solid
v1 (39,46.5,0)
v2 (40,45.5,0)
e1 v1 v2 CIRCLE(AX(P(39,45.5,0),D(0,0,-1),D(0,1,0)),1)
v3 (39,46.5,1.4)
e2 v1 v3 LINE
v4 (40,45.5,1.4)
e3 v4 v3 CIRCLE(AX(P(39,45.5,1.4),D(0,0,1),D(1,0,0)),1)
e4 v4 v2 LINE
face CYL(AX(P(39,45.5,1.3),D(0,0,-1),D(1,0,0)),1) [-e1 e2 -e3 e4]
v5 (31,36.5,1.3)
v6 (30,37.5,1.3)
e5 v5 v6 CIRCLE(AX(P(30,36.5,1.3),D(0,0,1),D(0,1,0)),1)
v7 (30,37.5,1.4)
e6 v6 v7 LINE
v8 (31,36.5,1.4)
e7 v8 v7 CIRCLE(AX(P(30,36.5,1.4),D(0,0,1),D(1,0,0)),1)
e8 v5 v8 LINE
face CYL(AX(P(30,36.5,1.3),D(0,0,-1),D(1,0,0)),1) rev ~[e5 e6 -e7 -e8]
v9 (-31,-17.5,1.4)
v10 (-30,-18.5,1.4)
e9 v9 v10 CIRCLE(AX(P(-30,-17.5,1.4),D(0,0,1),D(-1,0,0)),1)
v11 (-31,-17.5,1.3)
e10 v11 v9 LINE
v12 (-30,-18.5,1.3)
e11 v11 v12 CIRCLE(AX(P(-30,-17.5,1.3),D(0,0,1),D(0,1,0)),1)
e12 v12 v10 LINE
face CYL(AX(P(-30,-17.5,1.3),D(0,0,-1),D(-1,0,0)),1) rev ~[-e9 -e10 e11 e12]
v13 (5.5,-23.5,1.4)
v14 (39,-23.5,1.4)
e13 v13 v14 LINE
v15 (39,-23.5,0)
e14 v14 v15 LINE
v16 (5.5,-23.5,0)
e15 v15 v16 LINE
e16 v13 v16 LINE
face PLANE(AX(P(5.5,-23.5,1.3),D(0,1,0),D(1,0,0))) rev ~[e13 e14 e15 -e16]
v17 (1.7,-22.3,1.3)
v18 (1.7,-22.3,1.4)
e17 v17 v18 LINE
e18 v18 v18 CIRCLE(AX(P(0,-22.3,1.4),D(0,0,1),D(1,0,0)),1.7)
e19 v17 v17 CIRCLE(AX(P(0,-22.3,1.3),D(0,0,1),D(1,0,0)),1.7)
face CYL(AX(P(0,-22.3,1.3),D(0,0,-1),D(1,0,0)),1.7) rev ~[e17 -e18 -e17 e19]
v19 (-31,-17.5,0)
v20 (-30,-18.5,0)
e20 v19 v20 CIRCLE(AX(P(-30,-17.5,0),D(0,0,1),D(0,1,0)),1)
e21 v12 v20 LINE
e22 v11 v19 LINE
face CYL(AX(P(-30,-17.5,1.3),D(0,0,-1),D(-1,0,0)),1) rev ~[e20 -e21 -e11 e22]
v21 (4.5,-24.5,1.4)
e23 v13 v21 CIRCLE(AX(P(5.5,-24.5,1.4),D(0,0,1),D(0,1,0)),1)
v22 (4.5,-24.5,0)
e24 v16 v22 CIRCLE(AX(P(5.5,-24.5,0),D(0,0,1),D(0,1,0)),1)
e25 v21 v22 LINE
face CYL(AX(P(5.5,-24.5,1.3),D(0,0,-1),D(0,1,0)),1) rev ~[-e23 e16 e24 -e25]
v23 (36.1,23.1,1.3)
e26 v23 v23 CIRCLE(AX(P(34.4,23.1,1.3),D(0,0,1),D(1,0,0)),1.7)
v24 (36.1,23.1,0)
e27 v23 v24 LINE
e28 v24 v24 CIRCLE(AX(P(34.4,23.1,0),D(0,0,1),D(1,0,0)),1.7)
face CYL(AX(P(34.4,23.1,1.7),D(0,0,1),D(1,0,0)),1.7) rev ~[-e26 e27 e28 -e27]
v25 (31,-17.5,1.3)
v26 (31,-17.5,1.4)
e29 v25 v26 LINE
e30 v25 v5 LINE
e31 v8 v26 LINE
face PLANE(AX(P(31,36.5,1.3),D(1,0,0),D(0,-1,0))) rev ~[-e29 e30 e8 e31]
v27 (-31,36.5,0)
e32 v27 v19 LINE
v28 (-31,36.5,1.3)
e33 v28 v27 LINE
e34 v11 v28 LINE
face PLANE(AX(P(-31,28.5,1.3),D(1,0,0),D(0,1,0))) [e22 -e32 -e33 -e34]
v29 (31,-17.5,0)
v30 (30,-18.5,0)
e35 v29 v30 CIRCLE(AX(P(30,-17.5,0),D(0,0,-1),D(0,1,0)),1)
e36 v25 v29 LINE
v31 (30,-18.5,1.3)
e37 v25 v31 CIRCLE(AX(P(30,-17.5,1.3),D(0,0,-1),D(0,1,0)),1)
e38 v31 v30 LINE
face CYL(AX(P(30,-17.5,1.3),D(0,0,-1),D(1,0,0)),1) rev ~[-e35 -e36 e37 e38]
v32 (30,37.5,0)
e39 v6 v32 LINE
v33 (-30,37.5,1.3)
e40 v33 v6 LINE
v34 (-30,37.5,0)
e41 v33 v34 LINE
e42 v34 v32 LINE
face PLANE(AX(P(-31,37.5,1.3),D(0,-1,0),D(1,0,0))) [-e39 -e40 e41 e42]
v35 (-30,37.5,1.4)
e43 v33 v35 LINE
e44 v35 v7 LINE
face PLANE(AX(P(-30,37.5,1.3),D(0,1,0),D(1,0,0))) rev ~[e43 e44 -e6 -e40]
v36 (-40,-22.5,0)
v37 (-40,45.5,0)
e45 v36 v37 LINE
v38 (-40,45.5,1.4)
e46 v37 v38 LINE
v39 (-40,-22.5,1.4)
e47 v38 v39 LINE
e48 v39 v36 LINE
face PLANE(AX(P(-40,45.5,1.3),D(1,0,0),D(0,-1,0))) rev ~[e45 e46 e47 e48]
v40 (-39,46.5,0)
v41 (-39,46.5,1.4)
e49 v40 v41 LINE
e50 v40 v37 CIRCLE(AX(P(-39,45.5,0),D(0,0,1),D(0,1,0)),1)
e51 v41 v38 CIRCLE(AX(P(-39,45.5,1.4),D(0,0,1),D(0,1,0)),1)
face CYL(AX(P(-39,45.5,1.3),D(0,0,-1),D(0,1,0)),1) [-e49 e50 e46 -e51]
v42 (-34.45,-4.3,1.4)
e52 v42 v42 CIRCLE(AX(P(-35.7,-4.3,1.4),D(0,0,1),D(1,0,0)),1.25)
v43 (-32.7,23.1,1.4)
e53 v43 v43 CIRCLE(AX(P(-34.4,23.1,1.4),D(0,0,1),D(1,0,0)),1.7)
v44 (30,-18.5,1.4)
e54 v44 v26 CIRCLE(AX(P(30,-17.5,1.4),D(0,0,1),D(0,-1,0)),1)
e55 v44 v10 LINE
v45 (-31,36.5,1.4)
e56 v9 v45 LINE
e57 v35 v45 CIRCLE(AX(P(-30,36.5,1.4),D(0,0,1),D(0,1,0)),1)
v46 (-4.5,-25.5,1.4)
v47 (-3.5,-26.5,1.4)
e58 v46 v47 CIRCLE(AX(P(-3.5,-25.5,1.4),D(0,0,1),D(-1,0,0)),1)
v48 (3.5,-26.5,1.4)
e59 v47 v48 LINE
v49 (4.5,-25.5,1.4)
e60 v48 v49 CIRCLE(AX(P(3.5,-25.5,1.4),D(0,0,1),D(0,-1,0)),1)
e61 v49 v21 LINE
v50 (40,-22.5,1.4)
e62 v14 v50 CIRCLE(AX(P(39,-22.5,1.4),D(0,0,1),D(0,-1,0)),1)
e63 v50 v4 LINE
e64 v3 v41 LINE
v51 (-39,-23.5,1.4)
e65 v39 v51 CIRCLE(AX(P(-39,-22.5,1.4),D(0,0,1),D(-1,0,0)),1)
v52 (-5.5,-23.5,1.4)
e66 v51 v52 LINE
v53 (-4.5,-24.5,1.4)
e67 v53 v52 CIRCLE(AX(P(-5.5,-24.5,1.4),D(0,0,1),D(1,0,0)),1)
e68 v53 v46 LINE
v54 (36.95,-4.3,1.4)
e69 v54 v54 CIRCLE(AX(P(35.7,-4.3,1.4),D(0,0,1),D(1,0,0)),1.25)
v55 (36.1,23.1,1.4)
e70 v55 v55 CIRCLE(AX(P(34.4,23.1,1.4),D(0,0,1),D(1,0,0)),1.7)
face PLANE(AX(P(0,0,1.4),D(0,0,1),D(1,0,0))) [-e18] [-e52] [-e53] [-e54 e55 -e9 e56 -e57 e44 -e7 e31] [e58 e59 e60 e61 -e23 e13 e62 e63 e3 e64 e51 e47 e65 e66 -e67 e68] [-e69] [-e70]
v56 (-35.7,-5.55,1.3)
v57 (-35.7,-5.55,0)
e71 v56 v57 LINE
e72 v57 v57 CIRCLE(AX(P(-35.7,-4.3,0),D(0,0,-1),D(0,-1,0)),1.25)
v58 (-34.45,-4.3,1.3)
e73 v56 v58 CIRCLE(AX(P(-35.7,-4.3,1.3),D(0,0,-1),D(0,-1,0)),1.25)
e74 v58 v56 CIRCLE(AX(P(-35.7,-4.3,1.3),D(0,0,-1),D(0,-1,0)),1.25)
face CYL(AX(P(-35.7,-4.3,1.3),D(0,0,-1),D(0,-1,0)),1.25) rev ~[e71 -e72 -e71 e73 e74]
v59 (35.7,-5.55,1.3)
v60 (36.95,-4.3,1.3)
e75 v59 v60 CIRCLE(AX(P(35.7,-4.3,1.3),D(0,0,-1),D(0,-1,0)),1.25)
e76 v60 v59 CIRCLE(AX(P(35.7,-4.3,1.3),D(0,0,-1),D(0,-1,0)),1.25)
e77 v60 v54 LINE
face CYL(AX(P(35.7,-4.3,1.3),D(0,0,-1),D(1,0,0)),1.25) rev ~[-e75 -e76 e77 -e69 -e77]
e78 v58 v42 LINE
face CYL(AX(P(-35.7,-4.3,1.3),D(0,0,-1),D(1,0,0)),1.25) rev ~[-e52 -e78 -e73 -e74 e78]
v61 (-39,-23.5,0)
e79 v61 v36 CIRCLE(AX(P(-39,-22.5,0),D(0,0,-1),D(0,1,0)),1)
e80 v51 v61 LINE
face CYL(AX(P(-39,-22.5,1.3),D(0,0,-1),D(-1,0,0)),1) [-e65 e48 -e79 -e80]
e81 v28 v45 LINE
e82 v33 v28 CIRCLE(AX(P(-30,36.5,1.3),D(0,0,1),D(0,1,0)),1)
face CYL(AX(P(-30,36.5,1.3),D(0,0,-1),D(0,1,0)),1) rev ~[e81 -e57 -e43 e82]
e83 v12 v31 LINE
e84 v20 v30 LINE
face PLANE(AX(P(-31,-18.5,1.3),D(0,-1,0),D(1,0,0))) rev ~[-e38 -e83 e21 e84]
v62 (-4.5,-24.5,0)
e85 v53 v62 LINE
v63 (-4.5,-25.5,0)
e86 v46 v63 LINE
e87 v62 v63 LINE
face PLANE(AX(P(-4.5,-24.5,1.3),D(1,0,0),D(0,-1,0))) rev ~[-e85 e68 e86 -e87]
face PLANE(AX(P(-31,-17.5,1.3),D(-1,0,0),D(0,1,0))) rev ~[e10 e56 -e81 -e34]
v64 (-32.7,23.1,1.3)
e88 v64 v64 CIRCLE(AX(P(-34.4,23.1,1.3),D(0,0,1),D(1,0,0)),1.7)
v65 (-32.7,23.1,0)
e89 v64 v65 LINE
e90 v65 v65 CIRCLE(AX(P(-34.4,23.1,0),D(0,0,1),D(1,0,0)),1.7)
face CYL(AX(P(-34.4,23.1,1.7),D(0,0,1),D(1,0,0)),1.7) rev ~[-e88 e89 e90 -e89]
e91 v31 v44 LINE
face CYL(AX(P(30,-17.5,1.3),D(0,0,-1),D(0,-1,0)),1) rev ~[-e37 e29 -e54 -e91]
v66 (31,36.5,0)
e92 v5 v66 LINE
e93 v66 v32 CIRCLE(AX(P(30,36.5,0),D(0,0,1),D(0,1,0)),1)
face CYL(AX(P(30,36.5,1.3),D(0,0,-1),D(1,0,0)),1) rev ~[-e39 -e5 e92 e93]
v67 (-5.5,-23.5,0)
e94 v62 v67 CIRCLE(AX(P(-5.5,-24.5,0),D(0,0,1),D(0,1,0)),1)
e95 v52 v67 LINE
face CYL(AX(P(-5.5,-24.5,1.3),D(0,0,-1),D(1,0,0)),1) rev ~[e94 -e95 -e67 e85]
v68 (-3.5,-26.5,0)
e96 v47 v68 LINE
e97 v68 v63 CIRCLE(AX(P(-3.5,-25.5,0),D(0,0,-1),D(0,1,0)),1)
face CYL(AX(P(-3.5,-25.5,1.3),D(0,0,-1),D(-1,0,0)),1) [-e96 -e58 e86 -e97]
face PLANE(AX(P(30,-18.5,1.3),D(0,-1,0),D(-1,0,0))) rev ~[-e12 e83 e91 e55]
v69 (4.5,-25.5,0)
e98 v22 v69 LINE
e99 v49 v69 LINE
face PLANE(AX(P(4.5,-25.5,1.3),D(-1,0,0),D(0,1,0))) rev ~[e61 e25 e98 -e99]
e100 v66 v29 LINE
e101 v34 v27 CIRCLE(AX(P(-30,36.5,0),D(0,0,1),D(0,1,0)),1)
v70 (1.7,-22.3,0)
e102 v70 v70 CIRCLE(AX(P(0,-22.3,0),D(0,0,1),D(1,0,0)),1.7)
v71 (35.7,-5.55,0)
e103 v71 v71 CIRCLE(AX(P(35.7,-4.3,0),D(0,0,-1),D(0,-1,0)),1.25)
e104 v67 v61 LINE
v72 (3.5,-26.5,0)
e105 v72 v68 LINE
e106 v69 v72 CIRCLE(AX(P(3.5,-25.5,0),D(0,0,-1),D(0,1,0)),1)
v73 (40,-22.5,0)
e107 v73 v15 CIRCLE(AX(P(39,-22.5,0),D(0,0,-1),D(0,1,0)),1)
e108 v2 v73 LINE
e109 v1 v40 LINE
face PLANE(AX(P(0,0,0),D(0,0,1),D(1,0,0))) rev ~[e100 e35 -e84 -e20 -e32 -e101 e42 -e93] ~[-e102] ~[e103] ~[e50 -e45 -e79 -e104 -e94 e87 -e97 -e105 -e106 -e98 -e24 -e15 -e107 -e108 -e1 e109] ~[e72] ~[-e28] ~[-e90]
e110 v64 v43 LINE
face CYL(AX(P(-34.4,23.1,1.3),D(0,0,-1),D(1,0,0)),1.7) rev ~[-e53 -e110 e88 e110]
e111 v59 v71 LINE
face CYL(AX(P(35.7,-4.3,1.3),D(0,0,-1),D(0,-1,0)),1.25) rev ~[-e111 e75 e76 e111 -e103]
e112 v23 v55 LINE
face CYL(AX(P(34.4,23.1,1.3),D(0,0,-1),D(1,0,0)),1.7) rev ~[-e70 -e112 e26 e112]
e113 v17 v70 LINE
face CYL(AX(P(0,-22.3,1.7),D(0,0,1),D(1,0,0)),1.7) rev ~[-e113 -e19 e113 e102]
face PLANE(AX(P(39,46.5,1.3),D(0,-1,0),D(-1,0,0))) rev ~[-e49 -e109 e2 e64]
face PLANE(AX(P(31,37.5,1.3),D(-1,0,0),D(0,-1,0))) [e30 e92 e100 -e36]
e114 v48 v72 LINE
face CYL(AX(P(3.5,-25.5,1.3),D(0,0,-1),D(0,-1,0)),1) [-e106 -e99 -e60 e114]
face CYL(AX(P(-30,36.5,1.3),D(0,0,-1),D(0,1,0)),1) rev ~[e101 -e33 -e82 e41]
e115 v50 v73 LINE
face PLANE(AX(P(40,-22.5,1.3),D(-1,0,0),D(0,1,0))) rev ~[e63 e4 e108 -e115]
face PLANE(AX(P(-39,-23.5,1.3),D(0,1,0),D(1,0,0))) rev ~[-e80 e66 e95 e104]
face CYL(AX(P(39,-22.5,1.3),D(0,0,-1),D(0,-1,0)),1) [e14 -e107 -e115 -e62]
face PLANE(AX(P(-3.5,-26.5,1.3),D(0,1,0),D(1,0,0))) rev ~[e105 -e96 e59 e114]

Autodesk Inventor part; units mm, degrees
ref_plane "YZ Plane" through (0, 0, 0) normal (1, 0, 0) x (0, 1, 0)
ref_plane "XZ Plane" through (0, 0, 0) normal (0, 1, 0) x (-1, 0, 0)
ref_plane "XY Plane" through (0, 0, 0) normal (0, 0, 1) x (1, 0, 0)
sketch "Sketch1" plane through (0, 0, 0) normal (0, 0, 1) x (1, 0, 0)
  line L0 (-40, 32.5) -> (40, 32.5)
  line L1 (40, 32.5) -> (40, -32.5)
  line L2 (40, -32.5) -> (-40, -32.5)
  line L3 (-40, -32.5) -> (-40, 32.5)
  line L4 (-40, 32.5) -> (40, -32.5) construction
  line L5 (40, 32.5) -> (-40, -32.5) construction
  line L6 (-8, 32.5) -> (-8, 24.5)
  line L7 (-8, 24.5) -> (-20, 24.5)
  line L8 (-20, 24.5) -> (-20, 28.5)
  line L9 (-20, 28.5) -> (-40, 28.5)
  line L10 (-40, -27) -> (-19, -27)
  line L11 (-19, -27) -> (-15.5, -23.5)
  line L12 (-15.5, -23.5) -> (-9.5, -23.5)
  line L13 (-9.5, -23.5) -> (-9.5, -32.5)
  line L14 (9.5, -32.5) -> (9.5, -23.5)
  line L15 (9.5, -23.5) -> (15.5, -23.5)
  line L16 (15.5, -23.5) -> (19, -27)
  line L17 (19, -27) -> (40, -27)
  point P0 (0, 0)
  dimension "d0" = 80
  dimension "d1" = 65
  dimension "d2" = 19
  dimension "d3" = 45
  dimension "d4" = 9
  dimension "d5" = 3.5
  dimension "d6" = 6
  dimension "d7" = 45
  dimension "d8" = 8
  dimension "d9" = 8
  dimension "d10" = 12
  dimension "d11" = 4
extrude "Extrusion1" add sketch "Sketch1" along normal blind 1.3 contours L0 L1 L17 L16 L15 L14 L2 L13 L12 L11 L10 L3 L9 L8 L7 L6
sketch "Sketch2" plane through (0, 0, 1.3) normal (0, 0, 1) x (1, 0, 0)
  line L0 (-35.7, -4.3) -> (35.7, -4.3) construction
  line L1 (-40, -27) -> (-19, -27) projected
  point P0 (0, 0)
  point P1 (0, -4.3)
  dimension "d14" = 71.4
  dimension "d15" = 22.7
hole "Hole1" at (-35.7, -4.3, 1.3) at (35.7, -4.3, 1.3) direction (0, 0, -1) diameter 2.5 end through all
sketch "Sketch4" plane through (-8, 32.5, 0) normal (0, 1, 0) x (1, 0, 0)
  line L0 (10.9, -2.9) -> (5.1, -2.9) construction
  line L1 (10.9, -1.3) -> (5.1, -1.3)
  line L2 (5.1, -4.5) -> (10.9, -4.5)
  arc A0 (10.9, -4.5) -> (10.9, -1.3) centre (10.9, -2.9) ccw
  arc A1 (5.1, -1.3) -> (5.1, -4.5) centre (5.1, -2.9) ccw
  line L3 (48, -1.3) -> (0, -1.3) projected
  line L4 (10.9, -2.9) -> (5.1, -2.9) construction
  line L5 (10.9, -1.7) -> (5.1, -1.7)
  line L6 (5.1, -4.1) -> (10.9, -4.1)
  arc A2 (10.9, -4.1) -> (10.9, -1.7) centre (10.9, -2.9) ccw
  arc A3 (5.1, -1.7) -> (5.1, -4.1) centre (5.1, -2.9) ccw
  point P0 (8, 0)
  point P1 (8, -2.9)
  point P2 (3.5, -2.9)
  point P3 (12.5, -2.9)
  point P4 (8, -2.9)
  dimension "d23" = 3.2
  dimension "d24" = 9
  dimension "d25" = 0.4
extrude "Extrusion2" add sketch "Sketch4" against normal blind 6.8
sketch "Sketch5" plane through (0, 0, 1.3) normal (0, 0, 1) x (1, 0, 0)
  circle A0 centre (-34.4, 23.1) radius 1.7
  circle A1 centre (34.4, 23.1) radius 1.7
  circle A2 centre (0, -22.3) radius 1.7
  line L0 (-34.4, 23.1) -> (34.4, 23.1) construction
  circle A3 centre (35.7, -4.3) radius 1.25 projected
  point P0 (0, 0)
  point P1 (0, 23.1)
  dimension "d28" = 3.4
  dimension "d29" = 68.8
  dimension "d30" = 27.4
  dimension "d31" = 18
extrude "Extrusion3" add sketch "Sketch5" along normal blind 0.4 contours A0 | A1 | A2
sketch "Sketch6" plane through (0, -22.3, 1.7) normal (0, 0, 1) x (1, 0, 0)
  circle A0 centre (0, 0) radius 1.7 projected
  circle A1 centre (-34.4, 45.4) radius 1.7 projected
  circle A2 centre (34.4, 45.4) radius 1.7 projected
  point P0 (0, 22.3)
extrude "Extrusion4" cut sketch "Sketch6" against normal through all
sketch "Sketch7" plane through (0, 0, 1.3) normal (0, 0, 1) x (1, 0, 0)
  line L0 (40, 32.5) -> (-8, 32.5) projected
  line L1 (40, 32.5) -> (40, 46.5)
  line L2 (40, 46.5) -> (-40, 46.5)
  line L3 (-40, 28.5) -> (-40, -27) projected
  line L4 (-40, 46.5) -> (-40, 28.5)
  line L5 (-40, 28.5) -> (-31, 28.5)
  line L6 (-20, 28.5) -> (-40, 28.5) projected
  line L7 (-31, 28.5) -> (-31, 37.5)
  line L8 (-31, 37.5) -> (31, 37.5)
  line L9 (31, 37.5) -> (31, 32.5)
  point P0 (0, 0)
  dimension "d36" = 9
  dimension "d37" = 9
  dimension "d38" = 9
  dimension "d39" = 5
extrude "Extrusion5" add sketch "Sketch7" against normal up to surface (1.3 mm away)
sketch "Sketch8" plane through (0, 0, 1.3) normal (0, 0, 1) x (1, 0, 0)
  line L0 (31, 32.5) -> (2.9, 32.5) projected
  line L1 (31, 32.5) -> (-31, 32.5)
  line L2 (-31, 32.5) -> (-31, -18.5)
  line L3 (-31, -18.5) -> (31, -18.5)
  line L4 (31, -18.5) -> (31, 32.5)
  line L5 (-31, 28.5) -> (-31, 37.5) projected
  line L6 (-15.5, -23.5) -> (-9.5, -23.5) projected
  line L7 (-40, -27) -> (-19, -27) projected
  line L8 (-15.5, -23.5) -> (-40, -23.5)
  line L9 (-40, -23.5) -> (-40, -27)
  line L10 (-40, -27) -> (-15.5, -27)
  line L11 (-15.5, -27) -> (-15.5, -23.5)
  line L12 (15.5, -23.5) -> (19, -27) projected
  line L13 (19, -27) -> (40, -27) projected
  line L14 (15.5, -23.5) -> (40, -23.5)
  line L15 (40, -23.5) -> (40, -27)
  line L16 (40, -27) -> (15.5, -27)
  line L17 (15.5, -27) -> (15.5, -23.5)
  line L18 (9.5, -32.5) -> (9.5, -23.5) projected
  line L19 (-9.5, -32.5) -> (9.5, -32.5) projected
  line L20 (9.5, -26.5) -> (-9.5, -26.5)
  line L21 (-9.5, -26.5) -> (-9.5, -32.5)
  line L22 (-9.5, -32.5) -> (9.5, -32.5)
  line L23 (9.5, -32.5) -> (9.5, -26.5)
  line L24 (-9.5, -23.5) -> (-9.5, -32.5) projected
  line L25 (-9.5, -23.5) -> (-4.5, -23.5)
  line L26 (-4.5, -23.5) -> (-4.5, -26.5)
  line L27 (-4.5, -26.5) -> (-9.5, -26.5)
  line L28 (-9.5, -26.5) -> (-9.5, -23.5)
  line L29 (9.5, -23.5) -> (15.5, -23.5) projected
  line L30 (9.5, -23.5) -> (4.5, -23.5)
  line L31 (4.5, -23.5) -> (4.5, -26.5)
  line L32 (4.5, -26.5) -> (9.5, -26.5)
  line L33 (9.5, -26.5) -> (9.5, -23.5)
  point P0 (0, 0)
  point P1 (-19, -27)
  point P2 (2.9, 32.5)
  dimension "d42" = 51
  dimension "d43" = 8
  dimension "d44" = 5
  dimension "d45" = 5
extrude "Extrusion6" cut sketch "Sketch8" against normal through all
sketch "Sketch9" plane through (-2.9, 32.5, 4.5) normal (0, 0, 1) x (1, 0, 0)
  line L0 (-5.3856, 3.3152) -> (10.2234, 3.3152)
  line L1 (10.2234, 3.3152) -> (10.2234, -11.8662)
  line L2 (10.2234, -11.8662) -> (-5.3856, -11.8662)
  line L3 (-5.3856, -11.8662) -> (-5.3856, 3.3152)
  point P0 (2.9, -32.5)
extrude "Extrusion7" cut sketch "Sketch9" against normal through all
fillet "Fillet1" radius 1 12 edges at (-31, 37.5, 0.65) (-40, 46.5, 0.65) (31, 37.5, 0.65) (40, 46.5, 0.65) (40, -23.5, 0.65) (31, -18.5, 0.65) (4.5, -23.5, 0.65) (4.5, -26.5, 0.65) (-4.5, -26.5, 0.65) (-4.5, -23.5, 0.65) (-31, -18.5, 0.65) (-40, -23.5, 0.65)
sketch "Sketch10" plane through (0, 0, 1.3) normal (0, 0, 1) x (1, 0, 0)
  line L0 (39, 46.5) -> (-39, 46.5) projected
  circle A0 centre (-35.7, -4.3) radius 1.25 projected
  circle A1 centre (35.7, -4.3) radius 1.25 projected
  line L1 (31, 36.5) -> (31, -17.5) projected
  arc A2 (30, -18.5) -> (31, -17.5) centre (30, -17.5) ccw projected
  line L2 (30, -18.5) -> (-30, -18.5) projected
  arc A3 (-31, -17.5) -> (-30, -18.5) centre (-30, -17.5) ccw projected
  line L3 (-31, -17.5) -> (-31, 36.5) projected
  arc A4 (-30, 37.5) -> (-31, 36.5) centre (-30, 36.5) ccw projected
  line L4 (-30, 37.5) -> (30, 37.5) projected
  arc A5 (31, 36.5) -> (30, 37.5) centre (30, 36.5) ccw projected
  circle A6 centre (0, -22.3) radius 1.7 projected
  circle A7 centre (34.4, 23.1) radius 1.7 projected
  circle A8 centre (-34.4, 23.1) radius 1.7 projected
  arc A9 (-40, -22.5) -> (-39, -23.5) centre (-39, -22.5) ccw projected
  line L5 (-39, -23.5) -> (-5.5, -23.5) projected
  arc A10 (-4.5, -24.5) -> (-5.5, -23.5) centre (-5.5, -24.5) ccw projected
  line L6 (-4.5, -24.5) -> (-4.5, -25.5) projected
  arc A11 (-4.5, -25.5) -> (-3.5, -26.5) centre (-3.5, -25.5) ccw projected
  line L7 (-3.5, -26.5) -> (3.5, -26.5) projected
  arc A12 (3.5, -26.5) -> (4.5, -25.5) centre (3.5, -25.5) ccw projected
  line L8 (4.5, -25.5) -> (4.5, -24.5) projected
  arc A13 (5.5, -23.5) -> (4.5, -24.5) centre (5.5, -24.5) ccw projected
  line L9 (5.5, -23.5) -> (39, -23.5) projected
  arc A14 (39, -23.5) -> (40, -22.5) centre (39, -22.5) ccw projected
  line L10 (40, -22.5) -> (40, 45.5) projected
  arc A15 (40, 45.5) -> (39, 46.5) centre (39, 45.5) ccw projected
  line L11 (39, 46.5) -> (-39, 46.5) projected
  arc A16 (-39, 46.5) -> (-40, 45.5) centre (-39, 45.5) ccw projected
  line L12 (-40, 45.5) -> (-40, -22.5) projected
  point P0 (0, 0)
extrude "Extrusion8" add sketch "Sketch10" along normal blind 0.1
equation "\"d7\" = d3"
equation "\"d37\" = d36"
equation "\"d38\" = d36"
equation "\"d45\" = d44"
properties part number "PlacementTest"
